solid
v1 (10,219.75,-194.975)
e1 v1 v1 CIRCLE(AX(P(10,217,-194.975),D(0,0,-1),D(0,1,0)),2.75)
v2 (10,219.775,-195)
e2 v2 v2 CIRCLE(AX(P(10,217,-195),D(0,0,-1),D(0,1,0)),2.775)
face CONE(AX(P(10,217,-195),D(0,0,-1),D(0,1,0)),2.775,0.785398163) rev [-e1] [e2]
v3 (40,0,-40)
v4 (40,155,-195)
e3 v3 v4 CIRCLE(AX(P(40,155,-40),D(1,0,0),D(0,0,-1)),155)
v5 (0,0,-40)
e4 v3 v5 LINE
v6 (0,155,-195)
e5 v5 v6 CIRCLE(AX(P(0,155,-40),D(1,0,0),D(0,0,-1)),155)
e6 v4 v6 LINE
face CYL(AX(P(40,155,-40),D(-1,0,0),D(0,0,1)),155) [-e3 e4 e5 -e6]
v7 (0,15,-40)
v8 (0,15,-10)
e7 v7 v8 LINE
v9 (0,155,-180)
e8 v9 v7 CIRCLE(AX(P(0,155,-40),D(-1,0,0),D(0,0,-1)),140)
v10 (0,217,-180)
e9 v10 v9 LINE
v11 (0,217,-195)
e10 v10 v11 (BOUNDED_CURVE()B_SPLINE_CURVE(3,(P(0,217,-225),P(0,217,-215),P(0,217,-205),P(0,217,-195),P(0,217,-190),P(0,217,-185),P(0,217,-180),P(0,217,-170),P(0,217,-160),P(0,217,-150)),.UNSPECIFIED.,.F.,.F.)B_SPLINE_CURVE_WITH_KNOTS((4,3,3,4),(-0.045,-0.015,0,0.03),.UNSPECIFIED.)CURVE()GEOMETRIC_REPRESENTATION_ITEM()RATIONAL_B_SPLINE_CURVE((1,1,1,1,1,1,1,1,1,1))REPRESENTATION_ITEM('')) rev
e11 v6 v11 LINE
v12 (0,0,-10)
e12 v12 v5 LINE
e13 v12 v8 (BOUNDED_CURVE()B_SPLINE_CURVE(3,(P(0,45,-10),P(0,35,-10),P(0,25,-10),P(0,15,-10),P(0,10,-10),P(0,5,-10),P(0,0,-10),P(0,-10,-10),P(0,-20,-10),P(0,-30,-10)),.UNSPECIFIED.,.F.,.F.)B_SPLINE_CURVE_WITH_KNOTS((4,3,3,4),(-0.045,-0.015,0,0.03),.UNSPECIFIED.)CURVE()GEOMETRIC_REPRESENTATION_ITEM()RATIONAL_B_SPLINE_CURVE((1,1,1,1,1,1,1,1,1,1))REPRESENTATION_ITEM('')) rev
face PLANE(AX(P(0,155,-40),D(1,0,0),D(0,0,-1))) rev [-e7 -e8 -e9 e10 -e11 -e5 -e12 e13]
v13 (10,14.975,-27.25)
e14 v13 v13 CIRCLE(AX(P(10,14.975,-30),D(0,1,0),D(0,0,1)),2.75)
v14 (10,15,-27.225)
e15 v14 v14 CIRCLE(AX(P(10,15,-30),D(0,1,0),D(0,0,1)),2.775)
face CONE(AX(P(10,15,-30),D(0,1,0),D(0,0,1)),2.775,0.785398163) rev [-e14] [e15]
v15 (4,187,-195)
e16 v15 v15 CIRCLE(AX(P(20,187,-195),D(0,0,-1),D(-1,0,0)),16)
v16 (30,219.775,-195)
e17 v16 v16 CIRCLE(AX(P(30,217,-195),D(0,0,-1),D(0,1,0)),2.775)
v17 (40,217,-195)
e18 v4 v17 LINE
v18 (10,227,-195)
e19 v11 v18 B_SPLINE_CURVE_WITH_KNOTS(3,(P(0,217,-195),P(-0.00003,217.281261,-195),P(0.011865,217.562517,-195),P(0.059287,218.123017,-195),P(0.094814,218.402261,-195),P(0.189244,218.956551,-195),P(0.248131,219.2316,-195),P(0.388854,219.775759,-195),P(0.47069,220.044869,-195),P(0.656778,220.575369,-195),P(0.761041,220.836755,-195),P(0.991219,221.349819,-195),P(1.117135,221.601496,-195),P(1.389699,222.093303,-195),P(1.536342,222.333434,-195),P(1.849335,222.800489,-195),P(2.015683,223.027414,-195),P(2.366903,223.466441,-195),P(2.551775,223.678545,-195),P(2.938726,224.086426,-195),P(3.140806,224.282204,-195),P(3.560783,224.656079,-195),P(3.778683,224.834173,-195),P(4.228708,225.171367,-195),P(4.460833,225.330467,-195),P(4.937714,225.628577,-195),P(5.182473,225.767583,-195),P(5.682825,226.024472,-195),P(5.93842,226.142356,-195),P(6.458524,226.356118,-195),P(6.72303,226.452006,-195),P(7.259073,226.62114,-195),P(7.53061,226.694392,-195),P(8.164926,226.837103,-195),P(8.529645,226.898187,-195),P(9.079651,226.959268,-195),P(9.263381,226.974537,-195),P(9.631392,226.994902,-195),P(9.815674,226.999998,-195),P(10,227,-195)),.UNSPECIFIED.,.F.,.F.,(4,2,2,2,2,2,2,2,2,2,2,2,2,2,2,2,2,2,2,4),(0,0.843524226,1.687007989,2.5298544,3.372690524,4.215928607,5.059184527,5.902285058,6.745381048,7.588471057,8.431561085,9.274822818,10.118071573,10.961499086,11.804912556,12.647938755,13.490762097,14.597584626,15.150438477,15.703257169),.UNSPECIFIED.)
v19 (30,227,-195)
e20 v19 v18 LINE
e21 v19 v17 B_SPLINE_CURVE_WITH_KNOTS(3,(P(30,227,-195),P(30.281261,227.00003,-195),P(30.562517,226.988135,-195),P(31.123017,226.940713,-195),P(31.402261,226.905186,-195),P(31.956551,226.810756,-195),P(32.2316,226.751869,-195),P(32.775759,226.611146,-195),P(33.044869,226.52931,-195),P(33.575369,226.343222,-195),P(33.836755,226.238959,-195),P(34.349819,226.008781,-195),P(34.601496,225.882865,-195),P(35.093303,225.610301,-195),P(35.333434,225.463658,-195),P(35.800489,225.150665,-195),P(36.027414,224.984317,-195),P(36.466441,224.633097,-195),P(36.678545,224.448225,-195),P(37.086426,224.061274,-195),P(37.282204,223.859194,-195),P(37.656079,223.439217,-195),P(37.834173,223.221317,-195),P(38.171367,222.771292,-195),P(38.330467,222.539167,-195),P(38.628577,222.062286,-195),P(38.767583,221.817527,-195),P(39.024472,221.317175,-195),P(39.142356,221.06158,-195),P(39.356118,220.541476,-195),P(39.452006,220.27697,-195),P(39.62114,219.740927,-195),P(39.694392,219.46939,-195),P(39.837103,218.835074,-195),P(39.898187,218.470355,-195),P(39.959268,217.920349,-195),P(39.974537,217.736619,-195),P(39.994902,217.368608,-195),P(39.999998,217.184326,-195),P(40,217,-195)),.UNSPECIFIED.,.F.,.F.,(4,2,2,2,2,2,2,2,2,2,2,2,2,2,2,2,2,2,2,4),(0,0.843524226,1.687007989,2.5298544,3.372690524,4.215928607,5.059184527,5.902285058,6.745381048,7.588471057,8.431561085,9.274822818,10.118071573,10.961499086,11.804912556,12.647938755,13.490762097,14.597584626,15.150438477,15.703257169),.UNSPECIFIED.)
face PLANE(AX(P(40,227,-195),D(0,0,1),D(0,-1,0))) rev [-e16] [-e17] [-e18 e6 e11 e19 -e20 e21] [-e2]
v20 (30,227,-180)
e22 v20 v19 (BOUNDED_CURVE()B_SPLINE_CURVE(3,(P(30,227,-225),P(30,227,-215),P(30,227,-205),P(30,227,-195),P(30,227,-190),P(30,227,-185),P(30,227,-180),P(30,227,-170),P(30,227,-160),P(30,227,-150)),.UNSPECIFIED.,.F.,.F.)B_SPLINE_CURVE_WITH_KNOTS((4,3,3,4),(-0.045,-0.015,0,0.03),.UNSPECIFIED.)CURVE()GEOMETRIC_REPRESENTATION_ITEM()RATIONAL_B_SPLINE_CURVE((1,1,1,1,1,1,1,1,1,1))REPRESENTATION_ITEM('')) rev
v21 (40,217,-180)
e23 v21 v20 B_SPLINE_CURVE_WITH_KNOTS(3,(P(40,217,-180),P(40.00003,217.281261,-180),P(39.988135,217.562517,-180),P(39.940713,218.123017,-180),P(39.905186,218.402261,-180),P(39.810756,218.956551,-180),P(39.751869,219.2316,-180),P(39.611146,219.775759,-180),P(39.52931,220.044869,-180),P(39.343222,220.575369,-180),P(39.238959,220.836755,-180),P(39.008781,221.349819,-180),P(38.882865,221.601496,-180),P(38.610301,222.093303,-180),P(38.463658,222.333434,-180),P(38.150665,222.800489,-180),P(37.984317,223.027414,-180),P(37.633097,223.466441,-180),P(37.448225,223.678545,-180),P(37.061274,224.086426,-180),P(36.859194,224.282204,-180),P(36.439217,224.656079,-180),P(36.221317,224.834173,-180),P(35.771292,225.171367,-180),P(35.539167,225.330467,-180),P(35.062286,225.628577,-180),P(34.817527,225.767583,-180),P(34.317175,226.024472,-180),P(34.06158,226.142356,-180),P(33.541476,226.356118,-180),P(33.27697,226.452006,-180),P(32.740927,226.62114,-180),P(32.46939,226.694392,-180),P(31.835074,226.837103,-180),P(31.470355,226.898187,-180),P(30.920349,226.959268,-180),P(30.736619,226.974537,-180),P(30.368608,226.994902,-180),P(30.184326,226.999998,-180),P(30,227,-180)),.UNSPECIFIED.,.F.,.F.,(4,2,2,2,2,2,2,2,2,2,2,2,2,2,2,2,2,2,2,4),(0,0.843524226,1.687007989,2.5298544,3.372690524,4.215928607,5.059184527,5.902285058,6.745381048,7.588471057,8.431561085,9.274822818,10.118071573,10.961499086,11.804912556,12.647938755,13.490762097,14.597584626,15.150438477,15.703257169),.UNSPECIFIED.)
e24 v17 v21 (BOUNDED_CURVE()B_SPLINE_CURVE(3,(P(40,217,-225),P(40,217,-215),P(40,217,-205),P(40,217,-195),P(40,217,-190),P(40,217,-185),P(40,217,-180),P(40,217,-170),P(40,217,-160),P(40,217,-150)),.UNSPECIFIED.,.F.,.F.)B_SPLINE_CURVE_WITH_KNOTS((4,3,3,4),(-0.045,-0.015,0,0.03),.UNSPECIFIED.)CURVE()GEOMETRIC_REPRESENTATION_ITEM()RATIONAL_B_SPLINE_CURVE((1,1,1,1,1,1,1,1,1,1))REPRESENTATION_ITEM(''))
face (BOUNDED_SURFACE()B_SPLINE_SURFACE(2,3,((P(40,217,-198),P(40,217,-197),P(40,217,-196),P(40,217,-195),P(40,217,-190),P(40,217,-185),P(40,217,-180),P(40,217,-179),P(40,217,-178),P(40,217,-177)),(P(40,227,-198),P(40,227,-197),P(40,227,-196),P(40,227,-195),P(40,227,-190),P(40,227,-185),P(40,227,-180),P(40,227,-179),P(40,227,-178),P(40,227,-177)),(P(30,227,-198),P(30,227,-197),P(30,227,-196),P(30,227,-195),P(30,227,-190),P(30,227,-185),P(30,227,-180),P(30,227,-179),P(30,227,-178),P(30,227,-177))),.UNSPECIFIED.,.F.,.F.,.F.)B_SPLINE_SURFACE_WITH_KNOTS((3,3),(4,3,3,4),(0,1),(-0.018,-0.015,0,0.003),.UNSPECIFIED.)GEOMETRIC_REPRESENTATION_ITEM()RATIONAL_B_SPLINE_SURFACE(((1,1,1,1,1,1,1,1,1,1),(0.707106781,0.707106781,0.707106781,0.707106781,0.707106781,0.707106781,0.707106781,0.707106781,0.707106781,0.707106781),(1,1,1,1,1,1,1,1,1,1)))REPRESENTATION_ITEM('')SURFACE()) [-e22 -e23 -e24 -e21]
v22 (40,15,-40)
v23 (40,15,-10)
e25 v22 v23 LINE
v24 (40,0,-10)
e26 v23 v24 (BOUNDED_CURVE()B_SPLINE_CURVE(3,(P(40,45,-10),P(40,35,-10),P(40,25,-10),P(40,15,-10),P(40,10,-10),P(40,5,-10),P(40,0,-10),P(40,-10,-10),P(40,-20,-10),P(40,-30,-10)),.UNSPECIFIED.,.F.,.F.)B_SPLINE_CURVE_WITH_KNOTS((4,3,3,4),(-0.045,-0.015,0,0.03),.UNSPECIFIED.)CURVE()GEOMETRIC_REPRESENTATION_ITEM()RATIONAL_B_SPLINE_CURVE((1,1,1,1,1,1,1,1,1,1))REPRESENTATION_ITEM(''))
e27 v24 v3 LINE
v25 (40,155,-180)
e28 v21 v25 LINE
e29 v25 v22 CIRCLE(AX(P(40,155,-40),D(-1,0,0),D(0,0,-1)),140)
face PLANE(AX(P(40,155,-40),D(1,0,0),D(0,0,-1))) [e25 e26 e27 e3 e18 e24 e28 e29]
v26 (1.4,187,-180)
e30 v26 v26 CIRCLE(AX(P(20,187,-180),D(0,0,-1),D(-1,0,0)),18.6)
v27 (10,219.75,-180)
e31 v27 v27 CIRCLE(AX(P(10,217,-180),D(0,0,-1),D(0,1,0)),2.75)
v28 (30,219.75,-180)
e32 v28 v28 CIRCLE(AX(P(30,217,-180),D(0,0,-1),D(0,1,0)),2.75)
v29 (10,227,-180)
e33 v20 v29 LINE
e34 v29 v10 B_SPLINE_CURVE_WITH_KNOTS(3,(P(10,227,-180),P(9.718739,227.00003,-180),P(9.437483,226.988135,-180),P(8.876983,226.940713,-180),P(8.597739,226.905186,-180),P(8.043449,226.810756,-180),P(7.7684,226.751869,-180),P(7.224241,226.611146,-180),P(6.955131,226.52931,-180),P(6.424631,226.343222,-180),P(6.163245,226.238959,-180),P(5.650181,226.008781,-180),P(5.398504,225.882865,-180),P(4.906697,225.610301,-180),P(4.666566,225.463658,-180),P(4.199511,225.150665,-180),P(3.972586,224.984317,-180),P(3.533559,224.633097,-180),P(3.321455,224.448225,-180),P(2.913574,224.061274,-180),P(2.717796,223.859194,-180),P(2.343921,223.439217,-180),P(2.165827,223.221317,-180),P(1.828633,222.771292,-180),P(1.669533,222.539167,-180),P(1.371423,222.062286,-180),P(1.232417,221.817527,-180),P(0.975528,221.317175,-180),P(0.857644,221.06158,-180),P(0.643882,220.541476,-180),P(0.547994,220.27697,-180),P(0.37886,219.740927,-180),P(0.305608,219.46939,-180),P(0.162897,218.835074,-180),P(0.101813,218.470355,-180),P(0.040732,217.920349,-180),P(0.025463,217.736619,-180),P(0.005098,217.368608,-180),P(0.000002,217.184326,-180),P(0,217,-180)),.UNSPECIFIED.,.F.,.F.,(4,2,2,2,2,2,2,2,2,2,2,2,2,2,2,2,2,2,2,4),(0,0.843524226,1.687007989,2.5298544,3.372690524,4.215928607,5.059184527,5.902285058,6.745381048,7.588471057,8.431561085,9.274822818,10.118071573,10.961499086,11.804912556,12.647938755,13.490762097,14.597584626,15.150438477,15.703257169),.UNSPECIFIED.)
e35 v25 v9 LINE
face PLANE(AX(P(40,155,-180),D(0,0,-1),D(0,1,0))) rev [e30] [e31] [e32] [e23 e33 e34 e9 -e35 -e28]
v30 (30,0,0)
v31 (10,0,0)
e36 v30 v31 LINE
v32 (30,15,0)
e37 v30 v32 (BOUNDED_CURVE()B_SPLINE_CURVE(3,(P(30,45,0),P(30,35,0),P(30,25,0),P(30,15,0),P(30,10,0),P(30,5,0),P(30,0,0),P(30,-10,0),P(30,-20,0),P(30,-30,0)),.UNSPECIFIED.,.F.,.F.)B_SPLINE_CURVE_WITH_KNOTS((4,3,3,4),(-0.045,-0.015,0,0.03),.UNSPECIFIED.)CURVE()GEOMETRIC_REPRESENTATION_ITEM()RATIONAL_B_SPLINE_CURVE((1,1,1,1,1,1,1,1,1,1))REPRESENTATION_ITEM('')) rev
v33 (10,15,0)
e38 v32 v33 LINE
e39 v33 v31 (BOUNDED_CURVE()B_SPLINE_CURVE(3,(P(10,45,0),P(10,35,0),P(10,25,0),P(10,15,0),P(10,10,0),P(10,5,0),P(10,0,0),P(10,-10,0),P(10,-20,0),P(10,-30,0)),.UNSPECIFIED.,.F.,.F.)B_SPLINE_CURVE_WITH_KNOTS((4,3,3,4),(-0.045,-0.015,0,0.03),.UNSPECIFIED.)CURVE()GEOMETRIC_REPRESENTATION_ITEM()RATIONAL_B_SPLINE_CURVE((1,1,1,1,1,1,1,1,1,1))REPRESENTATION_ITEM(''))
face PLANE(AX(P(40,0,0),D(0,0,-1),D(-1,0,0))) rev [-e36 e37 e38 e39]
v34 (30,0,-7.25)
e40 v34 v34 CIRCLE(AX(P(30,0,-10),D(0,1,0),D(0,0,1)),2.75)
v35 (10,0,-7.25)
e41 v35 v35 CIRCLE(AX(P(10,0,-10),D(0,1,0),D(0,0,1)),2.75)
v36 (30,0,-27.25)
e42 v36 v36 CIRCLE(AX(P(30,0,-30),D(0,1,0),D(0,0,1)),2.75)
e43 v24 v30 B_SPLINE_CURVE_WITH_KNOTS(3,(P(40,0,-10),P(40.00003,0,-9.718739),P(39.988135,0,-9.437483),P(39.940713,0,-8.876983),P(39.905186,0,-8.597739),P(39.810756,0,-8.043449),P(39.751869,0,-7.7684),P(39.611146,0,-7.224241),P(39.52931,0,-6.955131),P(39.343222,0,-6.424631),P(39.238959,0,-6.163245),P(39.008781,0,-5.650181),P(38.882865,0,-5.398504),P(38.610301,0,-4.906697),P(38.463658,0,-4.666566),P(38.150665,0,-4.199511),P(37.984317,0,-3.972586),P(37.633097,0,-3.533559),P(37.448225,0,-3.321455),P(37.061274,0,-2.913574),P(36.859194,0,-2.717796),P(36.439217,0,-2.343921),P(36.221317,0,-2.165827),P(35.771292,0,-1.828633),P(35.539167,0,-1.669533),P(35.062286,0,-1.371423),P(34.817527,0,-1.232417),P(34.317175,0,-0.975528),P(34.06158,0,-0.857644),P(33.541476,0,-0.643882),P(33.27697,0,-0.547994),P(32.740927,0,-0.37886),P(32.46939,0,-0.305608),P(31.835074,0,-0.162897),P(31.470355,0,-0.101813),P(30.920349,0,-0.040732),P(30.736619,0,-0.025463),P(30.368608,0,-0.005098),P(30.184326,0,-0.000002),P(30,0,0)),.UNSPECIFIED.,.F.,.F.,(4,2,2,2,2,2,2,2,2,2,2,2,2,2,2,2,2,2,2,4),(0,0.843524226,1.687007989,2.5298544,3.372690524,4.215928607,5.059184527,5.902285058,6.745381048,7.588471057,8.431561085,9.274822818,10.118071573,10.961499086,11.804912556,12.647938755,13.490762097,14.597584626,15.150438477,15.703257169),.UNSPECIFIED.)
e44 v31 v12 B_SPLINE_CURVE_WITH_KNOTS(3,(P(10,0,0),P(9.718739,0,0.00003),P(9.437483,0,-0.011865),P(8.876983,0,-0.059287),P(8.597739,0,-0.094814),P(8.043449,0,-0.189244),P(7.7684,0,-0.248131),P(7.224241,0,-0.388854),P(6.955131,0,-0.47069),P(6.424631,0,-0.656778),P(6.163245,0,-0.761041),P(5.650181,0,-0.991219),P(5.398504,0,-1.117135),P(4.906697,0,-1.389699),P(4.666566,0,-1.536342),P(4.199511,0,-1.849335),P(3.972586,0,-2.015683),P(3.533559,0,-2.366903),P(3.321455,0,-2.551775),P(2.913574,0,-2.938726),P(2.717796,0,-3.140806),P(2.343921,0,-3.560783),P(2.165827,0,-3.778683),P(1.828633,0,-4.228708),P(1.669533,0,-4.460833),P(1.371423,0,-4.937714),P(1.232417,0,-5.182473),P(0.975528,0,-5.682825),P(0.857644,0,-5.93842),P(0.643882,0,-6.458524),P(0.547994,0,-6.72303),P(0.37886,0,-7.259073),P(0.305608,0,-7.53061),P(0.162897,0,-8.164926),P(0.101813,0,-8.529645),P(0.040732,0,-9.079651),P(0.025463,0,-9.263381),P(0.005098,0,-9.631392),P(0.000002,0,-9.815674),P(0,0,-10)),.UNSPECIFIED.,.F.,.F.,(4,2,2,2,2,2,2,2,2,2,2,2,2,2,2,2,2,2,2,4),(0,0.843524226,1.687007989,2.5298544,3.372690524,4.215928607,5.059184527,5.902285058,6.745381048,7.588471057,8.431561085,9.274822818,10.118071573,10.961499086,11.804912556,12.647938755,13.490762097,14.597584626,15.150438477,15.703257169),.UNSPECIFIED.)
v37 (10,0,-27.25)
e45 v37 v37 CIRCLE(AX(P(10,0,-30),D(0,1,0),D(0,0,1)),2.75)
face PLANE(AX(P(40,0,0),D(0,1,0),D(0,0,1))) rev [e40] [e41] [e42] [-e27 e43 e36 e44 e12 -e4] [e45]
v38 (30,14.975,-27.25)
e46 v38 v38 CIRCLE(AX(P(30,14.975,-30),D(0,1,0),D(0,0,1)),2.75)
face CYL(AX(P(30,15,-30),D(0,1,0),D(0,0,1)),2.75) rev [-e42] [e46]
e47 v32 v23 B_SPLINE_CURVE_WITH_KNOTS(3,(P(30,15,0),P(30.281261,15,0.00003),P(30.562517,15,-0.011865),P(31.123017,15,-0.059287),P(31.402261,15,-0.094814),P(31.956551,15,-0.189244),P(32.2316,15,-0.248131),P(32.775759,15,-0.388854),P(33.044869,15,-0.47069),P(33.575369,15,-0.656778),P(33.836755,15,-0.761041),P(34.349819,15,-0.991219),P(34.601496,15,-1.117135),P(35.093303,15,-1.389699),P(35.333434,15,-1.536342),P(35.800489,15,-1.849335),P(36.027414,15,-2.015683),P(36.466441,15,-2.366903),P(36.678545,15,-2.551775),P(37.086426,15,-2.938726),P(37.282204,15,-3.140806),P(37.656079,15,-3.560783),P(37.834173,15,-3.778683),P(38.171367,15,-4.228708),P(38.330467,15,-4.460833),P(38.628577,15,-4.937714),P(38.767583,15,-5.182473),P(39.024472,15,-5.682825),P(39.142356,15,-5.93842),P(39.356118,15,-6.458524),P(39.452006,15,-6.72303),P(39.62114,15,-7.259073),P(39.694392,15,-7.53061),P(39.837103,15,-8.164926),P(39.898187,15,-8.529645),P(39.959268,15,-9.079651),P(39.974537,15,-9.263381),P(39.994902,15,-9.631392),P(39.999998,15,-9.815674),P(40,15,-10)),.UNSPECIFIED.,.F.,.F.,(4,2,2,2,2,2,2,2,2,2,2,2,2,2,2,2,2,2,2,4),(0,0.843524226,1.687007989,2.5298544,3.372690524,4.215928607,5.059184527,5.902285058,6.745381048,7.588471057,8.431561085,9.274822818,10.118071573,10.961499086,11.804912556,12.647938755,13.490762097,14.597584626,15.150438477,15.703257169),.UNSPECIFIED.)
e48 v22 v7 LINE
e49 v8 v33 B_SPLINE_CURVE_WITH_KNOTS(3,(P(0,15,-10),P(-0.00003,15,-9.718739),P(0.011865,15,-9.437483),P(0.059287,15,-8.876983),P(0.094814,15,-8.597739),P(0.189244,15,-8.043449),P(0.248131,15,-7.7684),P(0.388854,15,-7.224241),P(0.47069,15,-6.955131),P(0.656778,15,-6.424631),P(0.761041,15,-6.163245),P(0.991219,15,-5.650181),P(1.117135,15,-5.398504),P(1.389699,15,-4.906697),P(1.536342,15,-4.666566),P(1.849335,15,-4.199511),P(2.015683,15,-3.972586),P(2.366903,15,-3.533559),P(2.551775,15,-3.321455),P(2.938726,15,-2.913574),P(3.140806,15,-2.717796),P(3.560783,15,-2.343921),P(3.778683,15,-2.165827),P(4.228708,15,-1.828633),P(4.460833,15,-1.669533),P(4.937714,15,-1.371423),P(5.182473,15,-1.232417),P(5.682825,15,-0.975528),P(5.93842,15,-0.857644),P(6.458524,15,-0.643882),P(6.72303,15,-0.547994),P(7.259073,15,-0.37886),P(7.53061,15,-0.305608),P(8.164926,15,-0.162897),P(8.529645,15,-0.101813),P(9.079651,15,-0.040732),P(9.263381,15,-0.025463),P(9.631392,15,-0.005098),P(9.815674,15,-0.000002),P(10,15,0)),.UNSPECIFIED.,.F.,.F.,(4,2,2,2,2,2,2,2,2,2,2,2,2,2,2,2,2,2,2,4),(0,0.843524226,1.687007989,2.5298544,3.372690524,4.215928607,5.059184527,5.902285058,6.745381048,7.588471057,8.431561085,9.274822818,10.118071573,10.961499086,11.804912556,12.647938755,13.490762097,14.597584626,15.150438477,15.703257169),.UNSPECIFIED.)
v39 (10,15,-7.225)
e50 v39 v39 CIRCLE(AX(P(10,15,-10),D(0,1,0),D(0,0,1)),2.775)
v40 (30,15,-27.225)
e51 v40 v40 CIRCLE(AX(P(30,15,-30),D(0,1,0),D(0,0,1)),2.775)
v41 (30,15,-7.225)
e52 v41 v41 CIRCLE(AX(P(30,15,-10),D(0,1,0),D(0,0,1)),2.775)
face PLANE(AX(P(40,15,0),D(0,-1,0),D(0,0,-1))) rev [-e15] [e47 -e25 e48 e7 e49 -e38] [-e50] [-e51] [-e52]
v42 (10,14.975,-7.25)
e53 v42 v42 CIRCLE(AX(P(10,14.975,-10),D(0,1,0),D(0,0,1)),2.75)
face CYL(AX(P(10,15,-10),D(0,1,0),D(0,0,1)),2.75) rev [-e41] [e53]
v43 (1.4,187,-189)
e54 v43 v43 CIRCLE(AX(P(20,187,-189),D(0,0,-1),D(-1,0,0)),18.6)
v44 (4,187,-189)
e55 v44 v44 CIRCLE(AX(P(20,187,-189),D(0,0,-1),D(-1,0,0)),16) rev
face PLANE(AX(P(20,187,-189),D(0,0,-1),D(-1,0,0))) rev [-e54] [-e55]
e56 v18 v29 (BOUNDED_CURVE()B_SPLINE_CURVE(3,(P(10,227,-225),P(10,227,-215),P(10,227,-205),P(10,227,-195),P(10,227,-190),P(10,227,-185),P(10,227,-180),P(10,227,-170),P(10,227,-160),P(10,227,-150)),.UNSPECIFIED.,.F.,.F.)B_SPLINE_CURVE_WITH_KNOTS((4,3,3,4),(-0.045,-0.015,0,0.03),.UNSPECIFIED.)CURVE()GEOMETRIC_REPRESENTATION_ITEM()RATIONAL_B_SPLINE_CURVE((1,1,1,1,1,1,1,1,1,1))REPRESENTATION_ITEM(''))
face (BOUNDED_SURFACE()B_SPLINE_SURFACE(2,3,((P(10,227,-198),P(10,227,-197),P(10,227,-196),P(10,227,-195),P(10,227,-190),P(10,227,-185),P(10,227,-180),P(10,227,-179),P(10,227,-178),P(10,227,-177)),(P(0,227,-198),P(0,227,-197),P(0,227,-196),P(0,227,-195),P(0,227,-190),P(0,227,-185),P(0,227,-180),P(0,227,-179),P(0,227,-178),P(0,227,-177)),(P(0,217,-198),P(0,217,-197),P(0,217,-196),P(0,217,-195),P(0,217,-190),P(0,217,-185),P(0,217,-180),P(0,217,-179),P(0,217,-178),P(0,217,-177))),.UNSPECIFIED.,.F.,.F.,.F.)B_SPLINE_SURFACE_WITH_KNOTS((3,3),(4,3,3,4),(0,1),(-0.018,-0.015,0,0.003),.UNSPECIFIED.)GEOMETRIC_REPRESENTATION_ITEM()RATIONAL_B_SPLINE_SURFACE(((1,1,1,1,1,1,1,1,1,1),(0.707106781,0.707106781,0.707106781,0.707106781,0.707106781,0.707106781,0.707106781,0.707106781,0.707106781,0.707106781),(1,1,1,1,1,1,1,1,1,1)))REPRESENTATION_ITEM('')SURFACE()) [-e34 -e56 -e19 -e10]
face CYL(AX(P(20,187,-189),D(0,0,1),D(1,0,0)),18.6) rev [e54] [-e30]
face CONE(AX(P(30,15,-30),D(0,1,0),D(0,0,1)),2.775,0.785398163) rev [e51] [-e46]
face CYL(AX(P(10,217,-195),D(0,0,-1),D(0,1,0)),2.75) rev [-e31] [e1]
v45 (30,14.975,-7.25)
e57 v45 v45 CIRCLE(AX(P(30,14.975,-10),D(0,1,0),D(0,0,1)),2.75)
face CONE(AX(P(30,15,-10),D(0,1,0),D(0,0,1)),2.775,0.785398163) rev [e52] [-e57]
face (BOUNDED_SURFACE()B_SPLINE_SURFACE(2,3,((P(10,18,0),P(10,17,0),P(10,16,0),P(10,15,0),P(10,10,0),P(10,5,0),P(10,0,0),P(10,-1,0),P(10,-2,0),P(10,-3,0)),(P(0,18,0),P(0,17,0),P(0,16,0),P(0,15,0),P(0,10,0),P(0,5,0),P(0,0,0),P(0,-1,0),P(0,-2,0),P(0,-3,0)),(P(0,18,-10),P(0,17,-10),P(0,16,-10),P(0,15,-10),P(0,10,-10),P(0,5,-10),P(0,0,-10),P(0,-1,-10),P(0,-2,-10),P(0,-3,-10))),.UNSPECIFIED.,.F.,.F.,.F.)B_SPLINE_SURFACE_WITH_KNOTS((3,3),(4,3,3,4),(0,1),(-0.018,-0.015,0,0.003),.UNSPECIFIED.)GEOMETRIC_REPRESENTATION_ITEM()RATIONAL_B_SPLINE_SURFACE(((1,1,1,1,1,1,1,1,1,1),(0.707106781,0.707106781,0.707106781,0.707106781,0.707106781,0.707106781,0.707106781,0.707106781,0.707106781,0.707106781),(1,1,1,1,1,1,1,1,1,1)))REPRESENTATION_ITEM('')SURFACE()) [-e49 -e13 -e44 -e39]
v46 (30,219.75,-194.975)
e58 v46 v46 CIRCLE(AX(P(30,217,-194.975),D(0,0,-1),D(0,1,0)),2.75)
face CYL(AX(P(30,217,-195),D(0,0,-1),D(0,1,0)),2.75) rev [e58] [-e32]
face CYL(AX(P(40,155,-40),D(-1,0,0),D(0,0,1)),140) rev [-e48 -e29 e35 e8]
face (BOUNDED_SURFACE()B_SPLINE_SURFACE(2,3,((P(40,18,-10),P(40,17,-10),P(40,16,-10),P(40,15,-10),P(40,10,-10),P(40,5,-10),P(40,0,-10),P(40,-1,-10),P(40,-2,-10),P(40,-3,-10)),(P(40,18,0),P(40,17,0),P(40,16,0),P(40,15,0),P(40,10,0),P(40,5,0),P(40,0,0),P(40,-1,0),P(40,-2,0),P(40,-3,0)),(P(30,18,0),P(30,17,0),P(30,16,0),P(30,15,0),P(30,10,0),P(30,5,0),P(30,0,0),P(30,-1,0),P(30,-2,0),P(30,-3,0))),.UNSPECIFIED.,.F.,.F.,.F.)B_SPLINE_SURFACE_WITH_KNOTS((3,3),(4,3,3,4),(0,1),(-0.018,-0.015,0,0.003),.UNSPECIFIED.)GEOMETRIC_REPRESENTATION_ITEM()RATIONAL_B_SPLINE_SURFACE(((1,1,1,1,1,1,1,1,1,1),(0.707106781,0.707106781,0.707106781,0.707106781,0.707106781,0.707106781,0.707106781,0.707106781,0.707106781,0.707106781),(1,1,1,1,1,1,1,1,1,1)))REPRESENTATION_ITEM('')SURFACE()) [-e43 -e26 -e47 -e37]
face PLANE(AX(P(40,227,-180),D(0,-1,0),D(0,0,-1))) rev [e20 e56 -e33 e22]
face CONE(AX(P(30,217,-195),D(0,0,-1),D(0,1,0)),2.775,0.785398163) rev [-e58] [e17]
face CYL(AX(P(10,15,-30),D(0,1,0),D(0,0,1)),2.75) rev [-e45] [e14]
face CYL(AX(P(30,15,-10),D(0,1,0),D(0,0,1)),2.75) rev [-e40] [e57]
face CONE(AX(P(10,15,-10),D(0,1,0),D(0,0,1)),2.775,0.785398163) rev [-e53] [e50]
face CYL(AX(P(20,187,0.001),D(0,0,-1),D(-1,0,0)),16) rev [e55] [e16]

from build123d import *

# Parameters (mm, degrees)
BOSS_EXTRUDE2_DEPTH            = 40
M5_CLEARANCE_HOLE2_D           = 5.5
M5_CLEARANCE_HOLE2_CSINK_D     = 5.55
M5_CLEARANCE_HOLE2_CSINK_ANGLE = 90
CUT_EXTRUDE1_REACH             = 303.917
SKETCH10_R                     = 16
SKETCH11_R                     = 18.6
CUT_EXTRUDE2_DEPTH             = 9
FILLET1_R                      = 10
M5_CLEARANCE_HOLE3_D           = 5.5
M5_CLEARANCE_HOLE3_CSINK_D     = 5.55
M5_CLEARANCE_HOLE3_CSINK_ANGLE = 90


with BuildPart() as part:
    # Sketch6 → Boss-Extrude2 (new body)
    with BuildSketch(Plane(origin=(0, 0, 0), x_dir=(0, 0, -1), z_dir=(1, 0, 0))):
        with BuildLine():
            Line((0, 0), (40, 0))
            ThreePointArc((40, 0), (149.601551084, 45.398448916), (195, 155))
            Line((195, 155), (195, 227))
            Line((195, 227), (180, 227))
            Line((180, 227), (180, 155))
            ThreePointArc((180, 155), (138.994949366, 56.005050634), (40, 15))
            Line((40, 15), (0, 15))
            Line((0, 15), (0, 0))
        make_face()
    extrude(amount=BOSS_EXTRUDE2_DEPTH)

    # M5 Clearance Hole2 (through all)
    with Locations(Plane(origin=(0, 15, 0), x_dir=(1, 0, 0), z_dir=(0, 1, 0))):
        with Locations((10, 30), (30, 30), (10, 10), (30, 10)):
            CounterSinkHole(M5_CLEARANCE_HOLE2_D / 2, M5_CLEARANCE_HOLE2_CSINK_D / 2, counter_sink_angle=M5_CLEARANCE_HOLE2_CSINK_ANGLE)

    # Sketch10 → Cut-Extrude1 (cut, up to next)
    with BuildSketch(Plane(origin=(0, 0, -195), x_dir=(-1, 0, 0), z_dir=(0, 0, -1)), mode=Mode.PRIVATE) as cut_extrude1_sk1:
        with Locations((-20, 187)):
            Circle(SKETCH10_R)
    cut_extrude1_tool1 = extrude(cut_extrude1_sk1.sketch, amount=-CUT_EXTRUDE1_REACH, mode=Mode.PRIVATE) & part.part
    add(cut_extrude1_tool1.solids().sort_by_distance((20, 187, -195))[0], mode=Mode.SUBTRACT)

    # Sketch11 → Cut-Extrude2 (cut)
    with BuildSketch(Plane(origin=(0, 0, -180), x_dir=(-1, 0, 0), z_dir=(0, 0, -1))):
        with Locations((-20, 187)):
            Circle(SKETCH11_R)
    extrude(amount=CUT_EXTRUDE2_DEPTH, mode=Mode.SUBTRACT)

    # Fillet1
    fillet1_edges = [part.edges().sort_by_distance(p)[0] for p in [
        (40, 7.5, 0),
        (0, 7.5, 0),
        (40, 227, -187.5),
        (0, 227, -187.5),
    ]]
    fillet(fillet1_edges, radius=FILLET1_R)

    # M5 Clearance Hole3 (through all)
    with Locations(Plane(origin=(0, 0, -195), x_dir=(-1, 0, 0), z_dir=(0, 0, -1))):
        with Locations((-30, 217), (-10, 217)):
            CounterSinkHole(M5_CLEARANCE_HOLE3_D / 2, M5_CLEARANCE_HOLE3_CSINK_D / 2, counter_sink_angle=M5_CLEARANCE_HOLE3_CSINK_ANGLE)


solid = part.part
